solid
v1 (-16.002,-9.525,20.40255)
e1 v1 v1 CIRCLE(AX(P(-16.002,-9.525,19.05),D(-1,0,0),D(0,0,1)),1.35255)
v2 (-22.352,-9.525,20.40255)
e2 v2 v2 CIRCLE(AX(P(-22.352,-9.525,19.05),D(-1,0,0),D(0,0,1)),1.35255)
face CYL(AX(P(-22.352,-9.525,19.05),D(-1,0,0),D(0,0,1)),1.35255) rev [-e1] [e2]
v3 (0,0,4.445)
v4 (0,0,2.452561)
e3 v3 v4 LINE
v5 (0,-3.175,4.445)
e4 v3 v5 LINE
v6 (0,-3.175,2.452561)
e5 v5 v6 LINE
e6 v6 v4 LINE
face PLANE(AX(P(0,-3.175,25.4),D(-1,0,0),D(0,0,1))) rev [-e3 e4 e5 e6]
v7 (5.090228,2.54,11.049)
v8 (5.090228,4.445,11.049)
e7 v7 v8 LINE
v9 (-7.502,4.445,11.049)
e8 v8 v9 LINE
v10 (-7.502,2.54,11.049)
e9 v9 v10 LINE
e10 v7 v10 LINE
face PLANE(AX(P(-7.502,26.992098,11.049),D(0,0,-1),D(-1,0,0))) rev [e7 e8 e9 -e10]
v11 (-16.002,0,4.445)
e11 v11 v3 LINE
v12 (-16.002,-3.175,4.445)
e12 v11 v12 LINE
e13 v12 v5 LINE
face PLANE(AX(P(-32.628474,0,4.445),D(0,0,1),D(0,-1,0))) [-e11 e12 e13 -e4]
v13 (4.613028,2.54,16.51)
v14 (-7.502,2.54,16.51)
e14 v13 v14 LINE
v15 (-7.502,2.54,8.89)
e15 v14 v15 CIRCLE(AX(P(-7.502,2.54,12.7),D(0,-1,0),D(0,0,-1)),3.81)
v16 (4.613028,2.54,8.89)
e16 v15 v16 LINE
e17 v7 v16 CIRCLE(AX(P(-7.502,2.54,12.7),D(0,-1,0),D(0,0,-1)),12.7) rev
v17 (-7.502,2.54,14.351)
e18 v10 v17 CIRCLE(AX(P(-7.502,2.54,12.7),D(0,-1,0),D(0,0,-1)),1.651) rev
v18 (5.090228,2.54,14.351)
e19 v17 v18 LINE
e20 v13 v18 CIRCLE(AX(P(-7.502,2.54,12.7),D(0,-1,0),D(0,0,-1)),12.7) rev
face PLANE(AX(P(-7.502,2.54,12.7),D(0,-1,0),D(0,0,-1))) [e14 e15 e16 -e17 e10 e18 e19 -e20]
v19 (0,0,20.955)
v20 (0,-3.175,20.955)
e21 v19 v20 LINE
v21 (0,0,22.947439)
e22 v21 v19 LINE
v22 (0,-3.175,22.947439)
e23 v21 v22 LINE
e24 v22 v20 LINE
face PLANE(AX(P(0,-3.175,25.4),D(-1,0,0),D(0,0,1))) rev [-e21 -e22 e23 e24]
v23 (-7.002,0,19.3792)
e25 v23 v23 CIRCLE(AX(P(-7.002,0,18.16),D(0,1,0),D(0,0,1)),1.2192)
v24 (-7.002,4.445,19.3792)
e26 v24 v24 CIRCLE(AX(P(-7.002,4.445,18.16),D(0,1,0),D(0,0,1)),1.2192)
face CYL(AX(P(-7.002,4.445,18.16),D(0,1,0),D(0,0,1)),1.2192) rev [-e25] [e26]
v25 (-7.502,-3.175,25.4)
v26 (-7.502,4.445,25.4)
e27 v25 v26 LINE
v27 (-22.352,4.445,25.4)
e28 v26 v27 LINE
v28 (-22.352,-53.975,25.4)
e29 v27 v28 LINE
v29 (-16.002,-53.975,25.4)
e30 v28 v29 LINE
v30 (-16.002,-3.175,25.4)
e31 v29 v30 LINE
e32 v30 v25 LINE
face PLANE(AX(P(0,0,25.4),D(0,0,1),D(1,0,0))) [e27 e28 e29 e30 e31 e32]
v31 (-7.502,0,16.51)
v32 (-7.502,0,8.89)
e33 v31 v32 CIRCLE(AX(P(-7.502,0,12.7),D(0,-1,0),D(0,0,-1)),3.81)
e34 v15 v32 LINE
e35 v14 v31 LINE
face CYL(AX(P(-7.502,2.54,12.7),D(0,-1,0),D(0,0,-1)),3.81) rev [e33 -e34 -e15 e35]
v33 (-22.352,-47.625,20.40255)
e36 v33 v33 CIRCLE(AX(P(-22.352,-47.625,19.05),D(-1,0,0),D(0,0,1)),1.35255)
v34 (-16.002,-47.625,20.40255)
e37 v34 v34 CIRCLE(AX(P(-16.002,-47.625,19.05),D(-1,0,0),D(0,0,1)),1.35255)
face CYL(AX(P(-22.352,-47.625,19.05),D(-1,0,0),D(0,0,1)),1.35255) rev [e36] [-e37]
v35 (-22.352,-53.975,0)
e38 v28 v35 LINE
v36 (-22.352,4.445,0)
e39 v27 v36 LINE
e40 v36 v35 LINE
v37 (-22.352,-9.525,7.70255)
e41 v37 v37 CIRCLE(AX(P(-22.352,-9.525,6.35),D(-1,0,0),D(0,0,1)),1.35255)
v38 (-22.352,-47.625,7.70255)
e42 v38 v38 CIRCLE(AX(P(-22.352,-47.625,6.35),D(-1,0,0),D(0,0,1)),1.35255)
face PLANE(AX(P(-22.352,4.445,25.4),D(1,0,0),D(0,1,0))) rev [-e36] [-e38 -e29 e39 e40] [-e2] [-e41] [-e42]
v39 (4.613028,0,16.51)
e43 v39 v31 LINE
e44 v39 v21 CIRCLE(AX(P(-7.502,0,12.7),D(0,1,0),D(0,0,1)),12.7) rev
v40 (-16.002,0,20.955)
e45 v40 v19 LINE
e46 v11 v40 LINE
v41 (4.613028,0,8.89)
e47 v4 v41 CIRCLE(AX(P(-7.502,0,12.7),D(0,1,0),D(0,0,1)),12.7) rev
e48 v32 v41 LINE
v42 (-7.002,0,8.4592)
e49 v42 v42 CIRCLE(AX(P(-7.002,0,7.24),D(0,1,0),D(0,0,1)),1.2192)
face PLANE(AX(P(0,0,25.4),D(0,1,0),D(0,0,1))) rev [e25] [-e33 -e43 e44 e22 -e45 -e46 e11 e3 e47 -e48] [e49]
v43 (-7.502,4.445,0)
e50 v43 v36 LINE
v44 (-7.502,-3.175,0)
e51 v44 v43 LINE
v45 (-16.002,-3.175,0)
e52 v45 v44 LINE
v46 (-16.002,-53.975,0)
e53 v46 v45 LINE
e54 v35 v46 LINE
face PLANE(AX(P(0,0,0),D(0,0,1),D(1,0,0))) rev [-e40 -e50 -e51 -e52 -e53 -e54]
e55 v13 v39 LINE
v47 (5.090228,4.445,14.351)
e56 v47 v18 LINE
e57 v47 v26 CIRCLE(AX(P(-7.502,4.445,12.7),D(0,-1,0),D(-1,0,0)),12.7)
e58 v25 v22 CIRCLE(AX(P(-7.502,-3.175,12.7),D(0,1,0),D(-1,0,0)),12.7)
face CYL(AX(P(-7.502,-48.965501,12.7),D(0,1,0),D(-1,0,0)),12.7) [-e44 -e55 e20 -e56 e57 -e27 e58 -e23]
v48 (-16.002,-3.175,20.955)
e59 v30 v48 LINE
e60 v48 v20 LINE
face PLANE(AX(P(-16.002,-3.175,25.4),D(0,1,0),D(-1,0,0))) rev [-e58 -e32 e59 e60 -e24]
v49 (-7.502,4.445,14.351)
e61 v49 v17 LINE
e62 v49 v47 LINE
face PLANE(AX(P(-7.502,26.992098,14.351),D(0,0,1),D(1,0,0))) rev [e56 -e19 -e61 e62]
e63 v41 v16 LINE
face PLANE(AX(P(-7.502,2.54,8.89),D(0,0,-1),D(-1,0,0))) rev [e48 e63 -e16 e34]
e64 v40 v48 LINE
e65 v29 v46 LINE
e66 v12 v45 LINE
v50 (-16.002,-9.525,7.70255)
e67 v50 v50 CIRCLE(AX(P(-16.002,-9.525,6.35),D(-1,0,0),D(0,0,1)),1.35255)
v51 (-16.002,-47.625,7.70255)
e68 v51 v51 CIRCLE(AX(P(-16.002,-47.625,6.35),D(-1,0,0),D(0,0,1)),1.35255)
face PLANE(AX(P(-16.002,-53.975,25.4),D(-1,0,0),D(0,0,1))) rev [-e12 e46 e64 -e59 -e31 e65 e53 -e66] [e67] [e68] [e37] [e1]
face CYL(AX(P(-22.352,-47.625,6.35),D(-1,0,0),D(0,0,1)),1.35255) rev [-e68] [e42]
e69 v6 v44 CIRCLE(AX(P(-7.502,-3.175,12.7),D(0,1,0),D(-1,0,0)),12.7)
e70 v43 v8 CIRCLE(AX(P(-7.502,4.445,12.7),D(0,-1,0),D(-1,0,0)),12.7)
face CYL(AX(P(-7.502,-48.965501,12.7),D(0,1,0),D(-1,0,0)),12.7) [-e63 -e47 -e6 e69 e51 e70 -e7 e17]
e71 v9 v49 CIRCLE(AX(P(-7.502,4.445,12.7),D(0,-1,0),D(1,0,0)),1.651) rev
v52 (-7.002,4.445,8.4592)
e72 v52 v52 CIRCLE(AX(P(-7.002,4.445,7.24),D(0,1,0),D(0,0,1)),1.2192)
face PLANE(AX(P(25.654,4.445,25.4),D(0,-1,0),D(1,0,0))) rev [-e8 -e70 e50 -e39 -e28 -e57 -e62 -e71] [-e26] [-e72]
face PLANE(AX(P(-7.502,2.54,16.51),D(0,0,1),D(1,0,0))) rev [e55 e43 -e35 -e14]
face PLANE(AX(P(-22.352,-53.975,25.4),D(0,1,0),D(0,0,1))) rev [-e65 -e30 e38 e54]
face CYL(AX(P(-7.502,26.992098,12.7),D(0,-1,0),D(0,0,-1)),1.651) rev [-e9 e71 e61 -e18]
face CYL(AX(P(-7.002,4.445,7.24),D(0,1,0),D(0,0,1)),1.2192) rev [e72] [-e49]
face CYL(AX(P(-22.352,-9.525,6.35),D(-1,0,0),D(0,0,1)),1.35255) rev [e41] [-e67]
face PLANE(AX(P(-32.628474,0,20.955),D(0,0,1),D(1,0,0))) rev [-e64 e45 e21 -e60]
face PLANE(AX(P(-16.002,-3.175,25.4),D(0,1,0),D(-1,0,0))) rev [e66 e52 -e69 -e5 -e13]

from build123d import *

# Parameters (mm, degrees)
BOSS_EXTRUDE1_DEPTH       = 25.4
SKETCH2_W                 = 16.51
SKETCH2_H                 = 1.964574829
SKETCH2_H_2               = 1.210425171
CUT_EXTRUDE1_DEPTH        = 16.002
CUT_EXTRUDE2_DEPTH        = 4.445
CUT_EXTRUDE3_DEPTH        = 2.54
FILLET1_R                 = 12.7
F_2_CLEARANCE_HOLE1_D     = 2.4384
F_2_CLEARANCE_HOLE1_DEPTH = 25.4
F_2_CLEARANCE_HOLE1_TIP   = 0.732569267
F_6_32_TAPPED_HOLE1_D     = 2.7051
F_6_32_TAPPED_HOLE1_DEPTH = 9.398
F_6_32_TAPPED_HOLE1_TIP   = 0.81269403
CUT_EXTRUDE4_REACH        = 70.674


with BuildPart() as part:
    # Sketch1 → Boss-Extrude1 (new body)
    with BuildSketch(Plane.XY):
        Polygon((-22.352, -53.975), (-16.002, -53.975), (-16.002, -3.175), (0, -3.175), (0, 0), (25.654, 0), (25.654, 4.445), (-22.352, 4.445), align=None)
    extrude(amount=BOSS_EXTRUDE1_DEPTH)

    # Sketch2 → Cut-Extrude1 (cut)
    with BuildSketch(Plane(origin=(0, 0, 0), x_dir=(0, 0, -1), z_dir=(1, 0, 0))):
        with Locations((-12.7, -0.982287415)):
            Rectangle(SKETCH2_W, SKETCH2_H)
        with Locations((-12.7, -2.569787415)):
            Rectangle(SKETCH2_W, SKETCH2_H_2)
    extrude(amount=-CUT_EXTRUDE1_DEPTH, mode=Mode.SUBTRACT)

    # Sketch3 → Cut-Extrude2 (cut)
    with BuildSketch(Plane.XZ):
        with BuildLine():
            Line((-7.502, 14.351), (11.5, 14.351))
            ThreePointArc((11.5, 14.351), (13.151, 12.7), (11.5, 11.049))
            Line((11.5, 11.049), (-7.502, 11.049))
            ThreePointArc((-7.502, 11.049), (-9.153, 12.7), (-7.502, 14.351))
        make_face()
    extrude(amount=-CUT_EXTRUDE2_DEPTH, mode=Mode.SUBTRACT)

    # Sketch4 → Cut-Extrude3 (cut)
    with BuildSketch(Plane.XZ):
        with BuildLine():
            Line((-7.502, 16.51), (11.5, 16.51))
            ThreePointArc((11.5, 16.51), (15.31, 12.7), (11.5, 8.89))
            Line((11.5, 8.89), (-7.502, 8.89))
            ThreePointArc((-7.502, 8.89), (-11.312, 12.7), (-7.502, 16.51))
        make_face()
    extrude(amount=-CUT_EXTRUDE3_DEPTH, mode=Mode.SUBTRACT)

    # Fillet1
    fillet1_edges = [part.edges().sort_by_distance(p)[0] for p in [
        (25.654, 2.2225, 0),
        (25.654, 2.2225, 25.4),
    ]]
    fillet(fillet1_edges, radius=FILLET1_R - 0.0001)  # a hair under: the kernel refuses the full size

    # #2 Clearance Hole1
    with Locations(Plane(origin=(0, 4.445, 0), x_dir=(1, 0, 0), z_dir=(0, 1, 0))):
        with Locations((-7.002, -18.16), (-7.002, -7.24)):
            Hole(F_2_CLEARANCE_HOLE1_D / 2, depth=F_2_CLEARANCE_HOLE1_DEPTH)
            with Locations((0, 0, -(F_2_CLEARANCE_HOLE1_DEPTH + F_2_CLEARANCE_HOLE1_TIP / 2))):  # 118° drill point
                Cone(0, F_2_CLEARANCE_HOLE1_D / 2, F_2_CLEARANCE_HOLE1_TIP, mode=Mode.SUBTRACT)

    # #6-32 Tapped Hole1
    with Locations(Plane.ZY.offset(22.352)):
        with Locations((6.35, -9.525), (19.05, -9.525), (6.35, -47.625), (19.05, -47.625)):
            Hole(F_6_32_TAPPED_HOLE1_D / 2, depth=F_6_32_TAPPED_HOLE1_DEPTH)
            with Locations((0, 0, -(F_6_32_TAPPED_HOLE1_DEPTH + F_6_32_TAPPED_HOLE1_TIP / 2))):  # 118° drill point
                Cone(0, F_6_32_TAPPED_HOLE1_D / 2, F_6_32_TAPPED_HOLE1_TIP, mode=Mode.SUBTRACT)

    # Cut-Extrude4: up to this face of the body (flat: up to its plane)
    cut_extrude4_end = Plane(part.part.faces().sort_by_distance((-8.001, -3.175, 23.1775))[0])
    # Sketch10 → Cut-Extrude4 (cut, up to the picked face)
    with BuildSketch(Plane(origin=(0, 4.445, 0), x_dir=(1, 0, 0), z_dir=(0, 1, 0)), mode=Mode.PRIVATE) as cut_extrude4_sk1:
        with BuildLine():
            Line((-7.502, -25.4), (30.598, -25.4))
            Line((30.598, -25.4), (30.598, 0))
            Line((30.598, 0), (-7.502, 0))
            ThreePointArc((-7.502, 0), (5.198, -12.7), (-7.502, -25.4))
        make_face()
    cut_extrude4_tool1 = split(extrude(cut_extrude4_sk1.sketch, amount=-CUT_EXTRUDE4_REACH, mode=Mode.PRIVATE), bisect_by=cut_extrude4_end, keep=Keep.BOTH, mode=Mode.PRIVATE)
    add(cut_extrude4_tool1.solids().sort_by(Axis((16.392438, 4.445, 12.7), (0, -1, 0)))[0], mode=Mode.SUBTRACT)


solid = part.part
